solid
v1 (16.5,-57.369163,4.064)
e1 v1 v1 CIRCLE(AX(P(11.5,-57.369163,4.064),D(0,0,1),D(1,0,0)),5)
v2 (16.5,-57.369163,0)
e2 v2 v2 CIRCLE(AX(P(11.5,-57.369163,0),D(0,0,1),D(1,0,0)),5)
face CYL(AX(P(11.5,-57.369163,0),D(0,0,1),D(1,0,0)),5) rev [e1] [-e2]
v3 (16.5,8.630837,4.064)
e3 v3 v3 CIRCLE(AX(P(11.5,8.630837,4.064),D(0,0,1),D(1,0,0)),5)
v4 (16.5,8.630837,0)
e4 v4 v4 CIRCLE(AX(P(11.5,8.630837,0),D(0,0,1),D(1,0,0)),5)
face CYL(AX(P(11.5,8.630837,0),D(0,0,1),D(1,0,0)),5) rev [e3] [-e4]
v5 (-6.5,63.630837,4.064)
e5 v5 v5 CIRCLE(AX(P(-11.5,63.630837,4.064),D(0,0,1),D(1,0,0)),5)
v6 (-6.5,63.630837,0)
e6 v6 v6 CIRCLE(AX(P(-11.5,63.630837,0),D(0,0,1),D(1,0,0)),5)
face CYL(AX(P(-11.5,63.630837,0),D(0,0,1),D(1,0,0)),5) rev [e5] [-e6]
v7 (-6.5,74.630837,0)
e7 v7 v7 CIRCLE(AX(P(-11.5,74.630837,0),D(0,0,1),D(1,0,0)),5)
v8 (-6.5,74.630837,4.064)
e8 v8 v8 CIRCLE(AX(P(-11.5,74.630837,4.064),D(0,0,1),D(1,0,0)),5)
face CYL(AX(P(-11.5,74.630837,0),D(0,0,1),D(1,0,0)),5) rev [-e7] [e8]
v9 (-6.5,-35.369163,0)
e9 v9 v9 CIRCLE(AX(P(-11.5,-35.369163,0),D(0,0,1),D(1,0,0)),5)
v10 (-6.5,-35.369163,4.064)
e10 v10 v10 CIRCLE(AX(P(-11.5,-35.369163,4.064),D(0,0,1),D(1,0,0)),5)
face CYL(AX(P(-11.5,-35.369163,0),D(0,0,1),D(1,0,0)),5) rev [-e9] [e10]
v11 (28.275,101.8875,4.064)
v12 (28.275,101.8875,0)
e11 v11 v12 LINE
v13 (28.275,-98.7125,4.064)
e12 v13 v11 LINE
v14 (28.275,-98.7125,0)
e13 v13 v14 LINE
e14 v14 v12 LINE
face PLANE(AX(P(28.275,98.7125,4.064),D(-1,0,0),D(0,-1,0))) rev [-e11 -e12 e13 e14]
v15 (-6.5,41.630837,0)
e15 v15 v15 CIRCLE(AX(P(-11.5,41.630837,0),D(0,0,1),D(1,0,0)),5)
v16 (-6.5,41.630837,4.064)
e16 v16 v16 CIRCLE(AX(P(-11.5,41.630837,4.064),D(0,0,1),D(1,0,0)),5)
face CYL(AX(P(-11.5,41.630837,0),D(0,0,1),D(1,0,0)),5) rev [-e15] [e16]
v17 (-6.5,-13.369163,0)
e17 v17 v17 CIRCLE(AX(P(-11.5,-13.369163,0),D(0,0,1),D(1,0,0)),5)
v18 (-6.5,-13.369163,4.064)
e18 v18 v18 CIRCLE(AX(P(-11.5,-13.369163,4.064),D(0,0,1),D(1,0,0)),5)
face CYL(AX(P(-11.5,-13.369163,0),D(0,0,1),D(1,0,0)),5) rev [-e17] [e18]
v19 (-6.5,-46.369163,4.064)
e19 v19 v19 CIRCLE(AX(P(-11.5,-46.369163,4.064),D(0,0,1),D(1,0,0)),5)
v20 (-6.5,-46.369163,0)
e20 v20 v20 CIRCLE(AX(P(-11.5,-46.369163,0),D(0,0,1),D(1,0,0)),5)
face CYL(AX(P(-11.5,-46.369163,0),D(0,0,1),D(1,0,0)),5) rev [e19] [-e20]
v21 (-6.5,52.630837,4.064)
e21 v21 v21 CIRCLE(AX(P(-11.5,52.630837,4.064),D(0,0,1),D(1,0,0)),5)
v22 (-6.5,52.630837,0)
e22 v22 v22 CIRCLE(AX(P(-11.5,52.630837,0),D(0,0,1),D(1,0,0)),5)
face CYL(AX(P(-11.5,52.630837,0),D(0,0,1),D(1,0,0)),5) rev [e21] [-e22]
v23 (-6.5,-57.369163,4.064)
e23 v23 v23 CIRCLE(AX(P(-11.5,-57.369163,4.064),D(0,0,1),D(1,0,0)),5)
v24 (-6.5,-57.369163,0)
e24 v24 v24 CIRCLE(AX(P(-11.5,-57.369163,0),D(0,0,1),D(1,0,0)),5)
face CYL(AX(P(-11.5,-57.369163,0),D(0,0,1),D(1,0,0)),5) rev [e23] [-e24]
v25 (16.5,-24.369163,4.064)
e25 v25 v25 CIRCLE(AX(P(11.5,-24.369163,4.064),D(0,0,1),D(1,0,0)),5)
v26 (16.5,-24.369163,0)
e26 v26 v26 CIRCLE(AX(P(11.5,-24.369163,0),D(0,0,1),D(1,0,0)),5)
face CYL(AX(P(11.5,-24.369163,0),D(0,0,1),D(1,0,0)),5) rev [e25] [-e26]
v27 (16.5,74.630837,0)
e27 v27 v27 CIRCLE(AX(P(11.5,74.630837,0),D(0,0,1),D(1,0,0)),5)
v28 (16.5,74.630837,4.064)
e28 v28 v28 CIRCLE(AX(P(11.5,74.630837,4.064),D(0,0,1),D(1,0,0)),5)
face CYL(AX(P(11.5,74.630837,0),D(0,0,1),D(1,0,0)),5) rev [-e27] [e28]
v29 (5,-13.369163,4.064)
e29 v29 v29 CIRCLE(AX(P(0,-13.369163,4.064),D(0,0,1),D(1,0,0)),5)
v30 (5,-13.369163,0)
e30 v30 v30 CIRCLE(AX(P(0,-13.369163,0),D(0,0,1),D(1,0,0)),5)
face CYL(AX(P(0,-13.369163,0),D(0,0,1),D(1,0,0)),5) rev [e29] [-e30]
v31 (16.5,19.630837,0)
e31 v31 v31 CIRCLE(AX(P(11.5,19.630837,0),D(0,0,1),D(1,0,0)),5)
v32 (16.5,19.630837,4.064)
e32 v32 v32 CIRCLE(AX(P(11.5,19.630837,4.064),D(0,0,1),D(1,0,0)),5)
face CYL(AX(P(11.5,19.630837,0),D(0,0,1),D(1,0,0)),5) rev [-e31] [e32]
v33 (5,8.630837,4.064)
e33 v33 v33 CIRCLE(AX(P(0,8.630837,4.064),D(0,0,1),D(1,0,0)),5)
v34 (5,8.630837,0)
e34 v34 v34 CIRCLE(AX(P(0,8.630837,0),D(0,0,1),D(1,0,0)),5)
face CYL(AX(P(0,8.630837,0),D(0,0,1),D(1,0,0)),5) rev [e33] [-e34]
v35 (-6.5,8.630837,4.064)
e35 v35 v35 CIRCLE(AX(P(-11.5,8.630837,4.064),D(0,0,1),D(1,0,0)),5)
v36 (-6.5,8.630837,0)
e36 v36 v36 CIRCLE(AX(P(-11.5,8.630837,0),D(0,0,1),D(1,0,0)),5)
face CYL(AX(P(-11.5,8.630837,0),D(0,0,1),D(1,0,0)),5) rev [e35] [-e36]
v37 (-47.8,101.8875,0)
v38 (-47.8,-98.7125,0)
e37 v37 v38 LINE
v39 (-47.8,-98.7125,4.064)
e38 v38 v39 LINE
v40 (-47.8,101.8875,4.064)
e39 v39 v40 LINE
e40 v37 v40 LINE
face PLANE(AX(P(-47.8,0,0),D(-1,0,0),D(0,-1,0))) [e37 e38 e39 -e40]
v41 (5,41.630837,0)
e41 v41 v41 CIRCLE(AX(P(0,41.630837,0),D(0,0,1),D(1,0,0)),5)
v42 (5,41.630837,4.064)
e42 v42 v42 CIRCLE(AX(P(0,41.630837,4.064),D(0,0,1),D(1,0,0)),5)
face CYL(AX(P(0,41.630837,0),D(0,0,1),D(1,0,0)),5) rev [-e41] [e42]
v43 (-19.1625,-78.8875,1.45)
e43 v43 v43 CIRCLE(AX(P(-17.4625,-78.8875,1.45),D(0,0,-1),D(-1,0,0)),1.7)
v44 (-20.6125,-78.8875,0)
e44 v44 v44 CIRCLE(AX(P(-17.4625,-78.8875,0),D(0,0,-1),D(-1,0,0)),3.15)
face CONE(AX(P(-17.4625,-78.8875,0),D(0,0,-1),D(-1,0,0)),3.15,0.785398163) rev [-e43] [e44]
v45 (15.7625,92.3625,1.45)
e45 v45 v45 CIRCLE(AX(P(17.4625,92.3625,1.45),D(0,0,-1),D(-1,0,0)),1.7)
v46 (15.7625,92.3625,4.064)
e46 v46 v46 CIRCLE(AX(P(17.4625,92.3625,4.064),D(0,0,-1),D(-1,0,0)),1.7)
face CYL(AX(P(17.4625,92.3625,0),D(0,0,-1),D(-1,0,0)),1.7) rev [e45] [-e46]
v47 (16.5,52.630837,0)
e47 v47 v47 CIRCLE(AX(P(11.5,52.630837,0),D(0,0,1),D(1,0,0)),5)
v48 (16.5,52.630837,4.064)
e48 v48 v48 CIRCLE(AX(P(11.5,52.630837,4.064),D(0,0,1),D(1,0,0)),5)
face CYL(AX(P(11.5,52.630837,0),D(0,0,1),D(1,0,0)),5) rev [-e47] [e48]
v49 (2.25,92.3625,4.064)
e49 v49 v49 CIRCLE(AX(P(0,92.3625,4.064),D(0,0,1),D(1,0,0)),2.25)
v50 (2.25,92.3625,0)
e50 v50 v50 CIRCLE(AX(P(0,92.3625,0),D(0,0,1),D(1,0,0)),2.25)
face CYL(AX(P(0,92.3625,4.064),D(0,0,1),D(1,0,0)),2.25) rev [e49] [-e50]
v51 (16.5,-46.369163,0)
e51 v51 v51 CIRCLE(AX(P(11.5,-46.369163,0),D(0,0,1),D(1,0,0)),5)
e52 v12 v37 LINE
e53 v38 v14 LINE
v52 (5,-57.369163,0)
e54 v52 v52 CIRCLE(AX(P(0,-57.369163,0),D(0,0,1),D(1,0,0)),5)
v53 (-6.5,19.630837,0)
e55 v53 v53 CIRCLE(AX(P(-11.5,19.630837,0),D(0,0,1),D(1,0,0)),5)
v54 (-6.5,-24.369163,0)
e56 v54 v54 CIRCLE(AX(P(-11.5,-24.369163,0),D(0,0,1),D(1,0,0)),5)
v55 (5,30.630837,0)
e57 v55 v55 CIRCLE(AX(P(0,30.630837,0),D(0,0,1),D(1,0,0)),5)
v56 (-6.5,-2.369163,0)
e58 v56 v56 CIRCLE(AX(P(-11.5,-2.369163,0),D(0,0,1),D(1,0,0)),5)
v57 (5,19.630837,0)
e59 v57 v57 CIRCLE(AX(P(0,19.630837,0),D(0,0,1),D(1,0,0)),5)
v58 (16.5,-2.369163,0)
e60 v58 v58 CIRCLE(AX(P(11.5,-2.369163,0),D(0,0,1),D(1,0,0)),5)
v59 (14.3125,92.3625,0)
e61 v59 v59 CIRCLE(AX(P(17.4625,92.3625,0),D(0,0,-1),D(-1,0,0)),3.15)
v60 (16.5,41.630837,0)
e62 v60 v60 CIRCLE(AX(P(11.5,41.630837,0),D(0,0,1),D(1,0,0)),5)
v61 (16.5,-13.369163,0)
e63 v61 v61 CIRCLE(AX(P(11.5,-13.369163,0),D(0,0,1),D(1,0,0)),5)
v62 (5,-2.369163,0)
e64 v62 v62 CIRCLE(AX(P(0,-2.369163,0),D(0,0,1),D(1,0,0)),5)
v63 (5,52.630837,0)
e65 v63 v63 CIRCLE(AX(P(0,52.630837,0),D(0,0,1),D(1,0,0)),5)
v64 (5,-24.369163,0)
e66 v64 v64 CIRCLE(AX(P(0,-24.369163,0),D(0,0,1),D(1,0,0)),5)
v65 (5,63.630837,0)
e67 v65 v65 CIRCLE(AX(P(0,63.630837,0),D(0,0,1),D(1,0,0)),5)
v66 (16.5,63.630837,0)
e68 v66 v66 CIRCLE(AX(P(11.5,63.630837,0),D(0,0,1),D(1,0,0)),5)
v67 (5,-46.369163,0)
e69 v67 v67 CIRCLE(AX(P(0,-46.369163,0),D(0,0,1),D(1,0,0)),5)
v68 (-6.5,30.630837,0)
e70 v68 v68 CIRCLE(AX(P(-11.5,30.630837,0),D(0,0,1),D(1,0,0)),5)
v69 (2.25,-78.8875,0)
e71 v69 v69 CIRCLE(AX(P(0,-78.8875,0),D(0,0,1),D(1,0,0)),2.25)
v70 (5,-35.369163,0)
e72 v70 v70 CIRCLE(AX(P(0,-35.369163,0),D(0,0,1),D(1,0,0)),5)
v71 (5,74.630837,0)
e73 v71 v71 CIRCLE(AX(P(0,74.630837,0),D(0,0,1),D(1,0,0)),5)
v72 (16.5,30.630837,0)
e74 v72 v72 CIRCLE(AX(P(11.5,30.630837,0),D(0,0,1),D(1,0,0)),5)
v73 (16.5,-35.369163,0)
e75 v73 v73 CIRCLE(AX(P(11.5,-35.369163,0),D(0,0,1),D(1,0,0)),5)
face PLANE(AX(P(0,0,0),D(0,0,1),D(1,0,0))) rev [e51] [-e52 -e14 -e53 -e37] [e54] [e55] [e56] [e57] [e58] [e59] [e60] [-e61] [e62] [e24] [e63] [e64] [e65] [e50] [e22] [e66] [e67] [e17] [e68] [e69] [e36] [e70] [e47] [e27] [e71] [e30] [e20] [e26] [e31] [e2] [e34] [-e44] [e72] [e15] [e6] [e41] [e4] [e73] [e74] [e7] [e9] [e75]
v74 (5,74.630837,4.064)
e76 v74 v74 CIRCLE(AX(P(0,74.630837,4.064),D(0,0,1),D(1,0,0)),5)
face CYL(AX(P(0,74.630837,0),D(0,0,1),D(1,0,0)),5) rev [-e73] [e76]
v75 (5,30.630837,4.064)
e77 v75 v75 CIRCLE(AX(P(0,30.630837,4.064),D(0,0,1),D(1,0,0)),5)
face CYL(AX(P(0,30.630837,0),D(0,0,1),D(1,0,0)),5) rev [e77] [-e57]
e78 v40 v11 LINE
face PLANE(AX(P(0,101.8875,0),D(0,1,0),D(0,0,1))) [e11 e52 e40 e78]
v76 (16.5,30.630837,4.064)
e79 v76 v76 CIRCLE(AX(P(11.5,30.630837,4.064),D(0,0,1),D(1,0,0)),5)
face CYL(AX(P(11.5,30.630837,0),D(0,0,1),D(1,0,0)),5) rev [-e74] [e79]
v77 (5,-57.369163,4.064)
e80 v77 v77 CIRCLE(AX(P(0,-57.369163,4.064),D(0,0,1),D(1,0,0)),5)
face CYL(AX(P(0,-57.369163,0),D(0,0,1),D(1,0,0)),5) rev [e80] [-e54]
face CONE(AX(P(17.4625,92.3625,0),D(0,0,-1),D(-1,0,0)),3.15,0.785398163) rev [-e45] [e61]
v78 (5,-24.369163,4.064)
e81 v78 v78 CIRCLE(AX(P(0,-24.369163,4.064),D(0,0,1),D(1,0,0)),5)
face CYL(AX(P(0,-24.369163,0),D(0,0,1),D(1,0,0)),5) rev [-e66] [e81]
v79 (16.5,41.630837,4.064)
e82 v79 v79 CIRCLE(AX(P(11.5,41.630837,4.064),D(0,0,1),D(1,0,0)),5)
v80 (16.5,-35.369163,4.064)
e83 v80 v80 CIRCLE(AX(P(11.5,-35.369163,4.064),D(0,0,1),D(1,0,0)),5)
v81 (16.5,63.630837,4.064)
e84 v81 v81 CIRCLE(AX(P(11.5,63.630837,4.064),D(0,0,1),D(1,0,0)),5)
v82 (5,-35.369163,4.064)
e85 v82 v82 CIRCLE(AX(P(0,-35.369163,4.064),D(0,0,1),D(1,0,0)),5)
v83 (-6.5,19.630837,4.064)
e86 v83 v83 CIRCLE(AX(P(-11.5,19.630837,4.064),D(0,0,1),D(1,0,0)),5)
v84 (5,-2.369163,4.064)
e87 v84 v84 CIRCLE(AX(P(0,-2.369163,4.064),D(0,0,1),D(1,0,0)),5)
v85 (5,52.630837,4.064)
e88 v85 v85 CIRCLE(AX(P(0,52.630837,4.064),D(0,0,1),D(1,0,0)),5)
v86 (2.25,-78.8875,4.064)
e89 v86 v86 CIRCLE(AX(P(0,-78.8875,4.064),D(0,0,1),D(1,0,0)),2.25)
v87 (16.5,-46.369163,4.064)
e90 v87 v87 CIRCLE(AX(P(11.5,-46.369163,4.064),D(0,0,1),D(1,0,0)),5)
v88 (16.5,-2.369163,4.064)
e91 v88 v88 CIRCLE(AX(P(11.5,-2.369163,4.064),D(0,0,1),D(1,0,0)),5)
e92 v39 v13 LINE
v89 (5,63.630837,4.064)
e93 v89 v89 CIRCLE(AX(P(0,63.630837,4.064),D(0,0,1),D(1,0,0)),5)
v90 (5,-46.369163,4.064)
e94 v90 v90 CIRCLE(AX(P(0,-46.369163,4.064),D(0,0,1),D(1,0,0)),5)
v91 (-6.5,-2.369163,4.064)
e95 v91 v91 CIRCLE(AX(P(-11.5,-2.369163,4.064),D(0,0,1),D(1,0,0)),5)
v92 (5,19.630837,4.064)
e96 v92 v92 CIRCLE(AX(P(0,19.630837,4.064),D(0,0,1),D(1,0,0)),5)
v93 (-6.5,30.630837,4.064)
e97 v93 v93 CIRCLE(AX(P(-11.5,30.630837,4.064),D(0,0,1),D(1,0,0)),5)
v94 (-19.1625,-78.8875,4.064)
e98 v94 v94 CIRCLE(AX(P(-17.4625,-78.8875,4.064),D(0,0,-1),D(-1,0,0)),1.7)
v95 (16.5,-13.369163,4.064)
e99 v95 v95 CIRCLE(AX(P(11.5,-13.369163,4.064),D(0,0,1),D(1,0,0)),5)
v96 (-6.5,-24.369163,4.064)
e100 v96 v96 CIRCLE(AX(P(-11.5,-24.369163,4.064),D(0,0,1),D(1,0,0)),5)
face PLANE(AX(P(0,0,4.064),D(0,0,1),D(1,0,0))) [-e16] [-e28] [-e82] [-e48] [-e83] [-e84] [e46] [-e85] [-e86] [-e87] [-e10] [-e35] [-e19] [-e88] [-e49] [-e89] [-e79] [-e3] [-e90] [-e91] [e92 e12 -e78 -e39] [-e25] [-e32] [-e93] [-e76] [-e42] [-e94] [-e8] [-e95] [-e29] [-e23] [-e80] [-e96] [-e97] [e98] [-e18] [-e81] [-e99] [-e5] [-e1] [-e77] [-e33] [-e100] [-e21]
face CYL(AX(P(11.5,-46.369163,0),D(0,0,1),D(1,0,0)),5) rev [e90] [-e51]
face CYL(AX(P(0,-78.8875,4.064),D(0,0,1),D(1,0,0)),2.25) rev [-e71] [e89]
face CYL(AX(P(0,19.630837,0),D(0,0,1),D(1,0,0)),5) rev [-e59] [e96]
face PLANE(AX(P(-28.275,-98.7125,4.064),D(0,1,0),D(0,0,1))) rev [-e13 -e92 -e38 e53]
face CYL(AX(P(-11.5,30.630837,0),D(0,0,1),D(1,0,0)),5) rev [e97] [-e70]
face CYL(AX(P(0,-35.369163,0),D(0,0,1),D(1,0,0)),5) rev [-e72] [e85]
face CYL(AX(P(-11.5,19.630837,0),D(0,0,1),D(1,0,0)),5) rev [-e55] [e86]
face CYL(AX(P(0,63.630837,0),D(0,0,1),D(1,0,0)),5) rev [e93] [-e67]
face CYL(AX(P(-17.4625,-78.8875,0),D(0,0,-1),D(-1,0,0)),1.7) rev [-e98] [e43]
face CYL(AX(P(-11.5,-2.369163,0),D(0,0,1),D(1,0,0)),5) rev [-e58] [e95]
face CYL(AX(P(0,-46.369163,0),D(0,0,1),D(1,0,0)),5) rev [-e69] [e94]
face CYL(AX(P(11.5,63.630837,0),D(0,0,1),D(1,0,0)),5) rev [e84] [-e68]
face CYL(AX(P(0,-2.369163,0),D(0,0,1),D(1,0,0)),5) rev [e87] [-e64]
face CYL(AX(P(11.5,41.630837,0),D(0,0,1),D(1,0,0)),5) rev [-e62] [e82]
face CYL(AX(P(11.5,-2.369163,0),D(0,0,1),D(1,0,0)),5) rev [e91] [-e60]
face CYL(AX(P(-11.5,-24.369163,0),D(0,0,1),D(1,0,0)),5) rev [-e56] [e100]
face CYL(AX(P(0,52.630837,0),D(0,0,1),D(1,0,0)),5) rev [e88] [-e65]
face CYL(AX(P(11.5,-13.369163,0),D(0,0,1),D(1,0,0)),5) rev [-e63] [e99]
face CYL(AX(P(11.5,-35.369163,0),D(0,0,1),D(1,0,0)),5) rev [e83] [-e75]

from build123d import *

# Parameters (mm, degrees)
BOSS_EXTRUDE1_OUTLINE_W                         = 56.55
BOSS_EXTRUDE1_OUTLINE_H                         = 197.425
BOSS_EXTRUDE1_DEPTH                             = 4.064
SKETCH4_R                                       = 5
CUT_EXTRUDE2_DEPTH                              = 103.762587439
LPATTERN3_COUNT                                 = 13
LPATTERN3_PITCH                                 = 11
SKETCH5_W                                       = 4.064
SKETCH5_H                                       = 197.425
BOSS_EXTRUDE2_DEPTH                             = 19.525
SKETCH14_W                                      = 76.075
SKETCH14_H                                      = 4.064
BOSS_EXTRUDE3_DEPTH                             = 3.175
M4_CLEARANCE_HOLE1_D                            = 4.5
CSK_FOR_M3_FLAT_HEAD_MACHINE_SCREW2_D           = 3.4
CSK_FOR_M3_FLAT_HEAD_MACHINE_SCREW2_CSINK_D     = 6.3
CSK_FOR_M3_FLAT_HEAD_MACHINE_SCREW2_CSINK_ANGLE = 90


# Read off the part's stored shape, not the designer's step: Boss-Extrude1
with BuildPart() as part:
    # Boss-Extrude1 outline → Boss-Extrude1 (new body)
    with BuildSketch(Plane.XY):
        Rectangle(BOSS_EXTRUDE1_OUTLINE_W, BOSS_EXTRUDE1_OUTLINE_H)
    extrude(amount=BOSS_EXTRUDE1_DEPTH)

    # Sketch4 → Cut-Extrude2 (cut, through all)
    with BuildSketch(Plane.XY.offset(4.064)):
        with Locations((0, -57.369162839)):
            Circle(SKETCH4_R)
        with Locations((11.5, -57.369162839)):
            Circle(SKETCH4_R)
        with Locations((-11.5, -57.369162839)):
            Circle(SKETCH4_R)
    cut_extrude2 = extrude(amount=-CUT_EXTRUDE2_DEPTH, mode=Mode.SUBTRACT)

    # LPattern3: Cut-Extrude2 ×13
    with Locations(*[(0, i * LPATTERN3_PITCH, 0) for i in range(1, LPATTERN3_COUNT)]):
        add(cut_extrude2, mode=Mode.SUBTRACT)

    # Sketch5 → Boss-Extrude2 (add)
    with BuildSketch(Plane.ZY.offset(28.275)):
        with Locations((2.032, 0)):
            Rectangle(SKETCH5_W, SKETCH5_H)
    extrude(amount=BOSS_EXTRUDE2_DEPTH)

    # Sketch14 → Boss-Extrude3 (add)
    with BuildSketch(Plane(origin=(0, 98.7125, 0), x_dir=(1, 0, 0), z_dir=(0, 1, 0))):
        with Locations((-9.7625, -2.032)):
            Rectangle(SKETCH14_W, SKETCH14_H)
    extrude(amount=BOSS_EXTRUDE3_DEPTH)

    # M4 Clearance Hole1 (through all)
    with Locations(Plane.XY.offset(4.064)):
        with Locations((0, 92.3625001), (0, -78.8874999)):
            Hole(M4_CLEARANCE_HOLE1_D / 2)

    # CSK for M3 Flat Head Machine Screw2 (through all)
    with Locations(Plane(origin=(0, 0, 0), x_dir=(-1, 0, 0), z_dir=(0, 0, -1))):
        with Locations((17.4625, -78.8874999), (-17.4625, 92.3625001)):
            CounterSinkHole(CSK_FOR_M3_FLAT_HEAD_MACHINE_SCREW2_D / 2, CSK_FOR_M3_FLAT_HEAD_MACHINE_SCREW2_CSINK_D / 2, counter_sink_angle=CSK_FOR_M3_FLAT_HEAD_MACHINE_SCREW2_CSINK_ANGLE)


solid = part.part
